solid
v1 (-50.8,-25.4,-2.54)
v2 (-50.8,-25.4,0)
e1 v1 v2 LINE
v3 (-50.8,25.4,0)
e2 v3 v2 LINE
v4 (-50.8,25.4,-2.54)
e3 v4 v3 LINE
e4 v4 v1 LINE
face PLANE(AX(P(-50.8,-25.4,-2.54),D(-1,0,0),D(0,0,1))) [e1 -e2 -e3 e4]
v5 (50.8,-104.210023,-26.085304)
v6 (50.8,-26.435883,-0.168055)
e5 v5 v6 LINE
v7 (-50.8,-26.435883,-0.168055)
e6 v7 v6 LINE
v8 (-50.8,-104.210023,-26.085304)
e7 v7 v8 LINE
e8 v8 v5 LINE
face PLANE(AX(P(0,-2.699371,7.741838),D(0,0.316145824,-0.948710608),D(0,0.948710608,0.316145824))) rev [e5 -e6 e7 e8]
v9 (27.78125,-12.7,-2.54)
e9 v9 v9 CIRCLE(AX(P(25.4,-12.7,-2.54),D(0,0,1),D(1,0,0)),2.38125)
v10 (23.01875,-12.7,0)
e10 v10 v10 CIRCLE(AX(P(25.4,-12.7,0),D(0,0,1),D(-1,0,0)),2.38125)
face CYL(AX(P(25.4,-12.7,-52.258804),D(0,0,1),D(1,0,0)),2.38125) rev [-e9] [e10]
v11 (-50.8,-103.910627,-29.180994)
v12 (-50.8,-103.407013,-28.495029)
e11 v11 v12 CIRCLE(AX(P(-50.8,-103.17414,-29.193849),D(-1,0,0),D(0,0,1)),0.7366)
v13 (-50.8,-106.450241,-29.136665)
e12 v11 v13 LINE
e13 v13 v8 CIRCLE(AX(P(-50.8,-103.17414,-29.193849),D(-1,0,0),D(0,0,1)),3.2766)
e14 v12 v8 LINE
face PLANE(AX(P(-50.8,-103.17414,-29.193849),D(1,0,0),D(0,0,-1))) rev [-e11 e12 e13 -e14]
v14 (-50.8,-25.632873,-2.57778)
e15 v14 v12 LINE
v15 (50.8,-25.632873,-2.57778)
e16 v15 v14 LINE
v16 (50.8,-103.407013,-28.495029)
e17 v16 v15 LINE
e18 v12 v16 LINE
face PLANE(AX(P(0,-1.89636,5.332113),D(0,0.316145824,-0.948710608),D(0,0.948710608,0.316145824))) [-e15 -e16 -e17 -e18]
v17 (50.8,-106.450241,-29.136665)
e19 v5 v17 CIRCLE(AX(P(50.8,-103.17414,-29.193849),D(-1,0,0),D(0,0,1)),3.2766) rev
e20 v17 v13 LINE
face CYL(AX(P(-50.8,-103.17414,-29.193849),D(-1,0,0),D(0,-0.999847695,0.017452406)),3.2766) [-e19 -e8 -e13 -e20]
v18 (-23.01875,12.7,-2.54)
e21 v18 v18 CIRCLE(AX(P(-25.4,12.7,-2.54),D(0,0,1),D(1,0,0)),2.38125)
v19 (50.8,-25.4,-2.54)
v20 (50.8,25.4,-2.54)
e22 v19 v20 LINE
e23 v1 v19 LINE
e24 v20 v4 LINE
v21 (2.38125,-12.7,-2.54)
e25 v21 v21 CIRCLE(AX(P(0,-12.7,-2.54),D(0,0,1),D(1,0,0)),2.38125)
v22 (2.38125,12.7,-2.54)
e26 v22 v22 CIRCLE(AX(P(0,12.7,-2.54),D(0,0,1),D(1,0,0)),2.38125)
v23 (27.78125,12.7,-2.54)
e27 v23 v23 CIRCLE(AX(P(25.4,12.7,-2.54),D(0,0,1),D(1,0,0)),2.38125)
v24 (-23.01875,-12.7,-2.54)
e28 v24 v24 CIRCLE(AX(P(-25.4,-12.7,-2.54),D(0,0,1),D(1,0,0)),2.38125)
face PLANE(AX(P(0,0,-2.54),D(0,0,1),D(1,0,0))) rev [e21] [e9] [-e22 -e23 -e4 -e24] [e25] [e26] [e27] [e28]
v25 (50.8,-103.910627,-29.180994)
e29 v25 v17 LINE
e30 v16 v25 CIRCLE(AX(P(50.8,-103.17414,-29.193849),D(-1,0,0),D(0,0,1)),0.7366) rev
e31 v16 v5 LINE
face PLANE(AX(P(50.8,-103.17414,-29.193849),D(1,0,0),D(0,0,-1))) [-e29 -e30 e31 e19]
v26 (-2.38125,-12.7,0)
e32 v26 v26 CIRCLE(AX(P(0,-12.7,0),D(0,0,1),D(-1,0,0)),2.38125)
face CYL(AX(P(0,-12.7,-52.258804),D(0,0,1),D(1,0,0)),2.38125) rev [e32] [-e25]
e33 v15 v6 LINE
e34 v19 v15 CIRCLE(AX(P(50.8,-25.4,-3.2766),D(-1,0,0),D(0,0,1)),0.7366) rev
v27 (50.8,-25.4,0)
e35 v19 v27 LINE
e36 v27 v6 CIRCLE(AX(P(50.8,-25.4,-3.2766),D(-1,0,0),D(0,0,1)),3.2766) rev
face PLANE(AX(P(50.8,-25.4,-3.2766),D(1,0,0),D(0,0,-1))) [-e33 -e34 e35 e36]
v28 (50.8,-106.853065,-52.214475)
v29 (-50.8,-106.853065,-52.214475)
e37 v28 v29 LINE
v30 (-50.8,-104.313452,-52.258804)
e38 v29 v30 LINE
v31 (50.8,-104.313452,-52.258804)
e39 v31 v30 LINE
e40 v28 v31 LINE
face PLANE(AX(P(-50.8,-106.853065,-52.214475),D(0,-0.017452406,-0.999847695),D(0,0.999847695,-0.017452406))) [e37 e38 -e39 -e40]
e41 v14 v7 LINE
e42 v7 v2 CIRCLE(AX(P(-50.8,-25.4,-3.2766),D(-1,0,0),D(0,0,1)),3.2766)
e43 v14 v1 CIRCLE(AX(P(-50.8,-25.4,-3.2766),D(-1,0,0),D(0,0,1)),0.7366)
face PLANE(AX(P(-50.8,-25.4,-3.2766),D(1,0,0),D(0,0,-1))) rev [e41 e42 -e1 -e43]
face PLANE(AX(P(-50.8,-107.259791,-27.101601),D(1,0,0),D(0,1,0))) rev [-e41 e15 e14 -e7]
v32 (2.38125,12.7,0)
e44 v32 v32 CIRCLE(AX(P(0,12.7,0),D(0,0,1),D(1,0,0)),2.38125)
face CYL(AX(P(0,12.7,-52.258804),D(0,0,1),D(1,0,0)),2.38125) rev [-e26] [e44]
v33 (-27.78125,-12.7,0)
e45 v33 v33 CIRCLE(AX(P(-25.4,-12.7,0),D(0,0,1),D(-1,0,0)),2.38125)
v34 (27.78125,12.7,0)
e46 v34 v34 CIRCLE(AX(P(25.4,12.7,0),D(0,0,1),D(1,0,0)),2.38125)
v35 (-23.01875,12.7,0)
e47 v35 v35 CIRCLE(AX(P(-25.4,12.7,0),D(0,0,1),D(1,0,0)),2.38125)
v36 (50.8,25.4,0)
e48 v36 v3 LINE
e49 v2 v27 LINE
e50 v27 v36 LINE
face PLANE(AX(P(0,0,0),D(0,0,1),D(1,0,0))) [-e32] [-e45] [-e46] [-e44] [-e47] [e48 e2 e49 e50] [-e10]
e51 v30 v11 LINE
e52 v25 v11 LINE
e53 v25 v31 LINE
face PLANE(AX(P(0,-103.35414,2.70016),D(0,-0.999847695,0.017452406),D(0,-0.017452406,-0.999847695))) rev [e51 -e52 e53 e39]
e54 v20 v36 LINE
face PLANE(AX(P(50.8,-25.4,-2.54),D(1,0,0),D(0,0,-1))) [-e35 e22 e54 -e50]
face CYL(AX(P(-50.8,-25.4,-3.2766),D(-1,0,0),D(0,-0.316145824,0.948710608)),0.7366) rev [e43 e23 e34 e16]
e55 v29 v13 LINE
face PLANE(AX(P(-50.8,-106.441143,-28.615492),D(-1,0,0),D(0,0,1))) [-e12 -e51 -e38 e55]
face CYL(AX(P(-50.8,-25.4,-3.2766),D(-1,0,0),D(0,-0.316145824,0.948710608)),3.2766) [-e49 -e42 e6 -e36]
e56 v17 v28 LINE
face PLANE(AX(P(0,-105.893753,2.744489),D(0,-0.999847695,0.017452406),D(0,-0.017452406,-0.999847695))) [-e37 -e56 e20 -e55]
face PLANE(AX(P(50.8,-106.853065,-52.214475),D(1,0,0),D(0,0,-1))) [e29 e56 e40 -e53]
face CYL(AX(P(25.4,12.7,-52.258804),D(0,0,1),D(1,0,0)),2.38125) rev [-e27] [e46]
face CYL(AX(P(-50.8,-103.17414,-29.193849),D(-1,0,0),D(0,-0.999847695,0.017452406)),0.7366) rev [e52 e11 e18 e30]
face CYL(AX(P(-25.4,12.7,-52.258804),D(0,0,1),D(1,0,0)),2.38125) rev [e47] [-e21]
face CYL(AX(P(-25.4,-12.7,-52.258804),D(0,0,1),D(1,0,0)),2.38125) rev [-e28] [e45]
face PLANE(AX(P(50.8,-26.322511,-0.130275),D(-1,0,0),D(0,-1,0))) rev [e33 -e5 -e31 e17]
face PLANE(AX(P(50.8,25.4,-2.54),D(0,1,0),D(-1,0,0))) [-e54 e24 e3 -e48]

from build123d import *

# Parameters (mm, degrees)
SKETCH1_W            = 101.6
SKETCH1_H            = 50.8
BASE_FLANGE1_DEPTH   = 2.54
EDGE_FLANGE1_DEPTH   = 101.6
EDGE_FLANGE2_START   = -50.8
EDGE_FLANGE2_DEPTH   = 101.6
EDGE_FLANGE2_2_DEPTH = 101.6
SKETCH12_R           = 2.38125
CUT_EXTRUDE1_DEPTH   = 130.341409222


# Read off the part's stored shape, not the designer's step: Edge-Flange2
# Sheet-metal steps are written as plain solids
with BuildPart() as part:
    # Sketch1 → Base-Flange1 (new body)
    with BuildSketch(Plane.XY):
        Rectangle(SKETCH1_W, SKETCH1_H)
    extrude(amount=-BASE_FLANGE1_DEPTH)

    # Edge-Flange1 section (across the edge) → Edge-Flange1 (add)
    with BuildSketch(Plane(origin=(50.8, -25.519501076, -2.54), x_dir=(0, 0.3161458239738, -0.9487106081329159), z_dir=(-1, 0, 0))):
        with BuildLine():
            Line((-2.54, 0.119501076), (-2.54, 85.312927325))
            Line((-2.54, 85.312927325), (0, 85.312927325))
            Line((0, 85.312927325), (0, 0.119501076))
            ThreePointArc((0, 0.119501076), (0.009506284, 0.001542236), (0.037779766, -0.113371938))
            Line((0.037779766, -0.113371938), (-2.371945179, -0.916382331))
            ThreePointArc((-2.371945179, -0.916382331), (-2.497713427, -0.405212383), (-2.54, 0.119501076))
        make_face()
    extrude(amount=EDGE_FLANGE1_DEPTH)

    # Edge-Flange2 outline → Edge-Flange2 (cut)
    with BuildSketch(Plane.YZ.offset(EDGE_FLANGE2_START)):
        with BuildLine():
            Line((-106.45678024, -29.511325705), (-106.45024051, -29.136664838))
            ThreePointArc((-106.45024051, -29.136664838), (-105.815351907, -27.254750412), (-104.210022959, -26.085304214))
            Line((-104.210022959, -26.085304214), (-107.259790633, -27.10160076))
            Line((-107.259790633, -27.10160076), (-106.45678024, -29.511325705))
        make_face()
    extrude(amount=EDGE_FLANGE2_DEPTH, mode=Mode.SUBTRACT)

    # Edge-Flange2 2 outline → Edge-Flange2 2 (add)
    with BuildSketch(Plane.YZ.offset(EDGE_FLANGE2_START)):
        with BuildLine():
            Line((-103.407012566, -28.495029159), (-106.45678024, -29.511325705))
            Line((-106.45678024, -29.511325705), (-106.853065184, -52.214474934))
            Line((-106.853065184, -52.214474934), (-104.313452038, -52.258804046))
            Line((-104.313452038, -52.258804046), (-103.910627364, -29.18099395))
            ThreePointArc((-103.910627364, -29.18099395), (-103.767900469, -28.757927917), (-103.407012566, -28.495029159))
        make_face()
    extrude(amount=EDGE_FLANGE2_2_DEPTH)

    # Sketch12 → Cut-Extrude1 (cut, through all)
    with BuildSketch(Plane.XY):
        with Locations((-25.4, 12.7)):
            Circle(SKETCH12_R)
        with Locations((0, 12.7)):
            Circle(SKETCH12_R)
        with Locations((25.4, 12.7)):
            Circle(SKETCH12_R)
        with Locations((25.4, -12.7)):
            Circle(SKETCH12_R)
        with Locations((0, -12.7)):
            Circle(SKETCH12_R)
        with Locations((-25.4, -12.7)):
            Circle(SKETCH12_R)
    extrude(amount=-CUT_EXTRUDE1_DEPTH, mode=Mode.SUBTRACT)


solid = part.part
